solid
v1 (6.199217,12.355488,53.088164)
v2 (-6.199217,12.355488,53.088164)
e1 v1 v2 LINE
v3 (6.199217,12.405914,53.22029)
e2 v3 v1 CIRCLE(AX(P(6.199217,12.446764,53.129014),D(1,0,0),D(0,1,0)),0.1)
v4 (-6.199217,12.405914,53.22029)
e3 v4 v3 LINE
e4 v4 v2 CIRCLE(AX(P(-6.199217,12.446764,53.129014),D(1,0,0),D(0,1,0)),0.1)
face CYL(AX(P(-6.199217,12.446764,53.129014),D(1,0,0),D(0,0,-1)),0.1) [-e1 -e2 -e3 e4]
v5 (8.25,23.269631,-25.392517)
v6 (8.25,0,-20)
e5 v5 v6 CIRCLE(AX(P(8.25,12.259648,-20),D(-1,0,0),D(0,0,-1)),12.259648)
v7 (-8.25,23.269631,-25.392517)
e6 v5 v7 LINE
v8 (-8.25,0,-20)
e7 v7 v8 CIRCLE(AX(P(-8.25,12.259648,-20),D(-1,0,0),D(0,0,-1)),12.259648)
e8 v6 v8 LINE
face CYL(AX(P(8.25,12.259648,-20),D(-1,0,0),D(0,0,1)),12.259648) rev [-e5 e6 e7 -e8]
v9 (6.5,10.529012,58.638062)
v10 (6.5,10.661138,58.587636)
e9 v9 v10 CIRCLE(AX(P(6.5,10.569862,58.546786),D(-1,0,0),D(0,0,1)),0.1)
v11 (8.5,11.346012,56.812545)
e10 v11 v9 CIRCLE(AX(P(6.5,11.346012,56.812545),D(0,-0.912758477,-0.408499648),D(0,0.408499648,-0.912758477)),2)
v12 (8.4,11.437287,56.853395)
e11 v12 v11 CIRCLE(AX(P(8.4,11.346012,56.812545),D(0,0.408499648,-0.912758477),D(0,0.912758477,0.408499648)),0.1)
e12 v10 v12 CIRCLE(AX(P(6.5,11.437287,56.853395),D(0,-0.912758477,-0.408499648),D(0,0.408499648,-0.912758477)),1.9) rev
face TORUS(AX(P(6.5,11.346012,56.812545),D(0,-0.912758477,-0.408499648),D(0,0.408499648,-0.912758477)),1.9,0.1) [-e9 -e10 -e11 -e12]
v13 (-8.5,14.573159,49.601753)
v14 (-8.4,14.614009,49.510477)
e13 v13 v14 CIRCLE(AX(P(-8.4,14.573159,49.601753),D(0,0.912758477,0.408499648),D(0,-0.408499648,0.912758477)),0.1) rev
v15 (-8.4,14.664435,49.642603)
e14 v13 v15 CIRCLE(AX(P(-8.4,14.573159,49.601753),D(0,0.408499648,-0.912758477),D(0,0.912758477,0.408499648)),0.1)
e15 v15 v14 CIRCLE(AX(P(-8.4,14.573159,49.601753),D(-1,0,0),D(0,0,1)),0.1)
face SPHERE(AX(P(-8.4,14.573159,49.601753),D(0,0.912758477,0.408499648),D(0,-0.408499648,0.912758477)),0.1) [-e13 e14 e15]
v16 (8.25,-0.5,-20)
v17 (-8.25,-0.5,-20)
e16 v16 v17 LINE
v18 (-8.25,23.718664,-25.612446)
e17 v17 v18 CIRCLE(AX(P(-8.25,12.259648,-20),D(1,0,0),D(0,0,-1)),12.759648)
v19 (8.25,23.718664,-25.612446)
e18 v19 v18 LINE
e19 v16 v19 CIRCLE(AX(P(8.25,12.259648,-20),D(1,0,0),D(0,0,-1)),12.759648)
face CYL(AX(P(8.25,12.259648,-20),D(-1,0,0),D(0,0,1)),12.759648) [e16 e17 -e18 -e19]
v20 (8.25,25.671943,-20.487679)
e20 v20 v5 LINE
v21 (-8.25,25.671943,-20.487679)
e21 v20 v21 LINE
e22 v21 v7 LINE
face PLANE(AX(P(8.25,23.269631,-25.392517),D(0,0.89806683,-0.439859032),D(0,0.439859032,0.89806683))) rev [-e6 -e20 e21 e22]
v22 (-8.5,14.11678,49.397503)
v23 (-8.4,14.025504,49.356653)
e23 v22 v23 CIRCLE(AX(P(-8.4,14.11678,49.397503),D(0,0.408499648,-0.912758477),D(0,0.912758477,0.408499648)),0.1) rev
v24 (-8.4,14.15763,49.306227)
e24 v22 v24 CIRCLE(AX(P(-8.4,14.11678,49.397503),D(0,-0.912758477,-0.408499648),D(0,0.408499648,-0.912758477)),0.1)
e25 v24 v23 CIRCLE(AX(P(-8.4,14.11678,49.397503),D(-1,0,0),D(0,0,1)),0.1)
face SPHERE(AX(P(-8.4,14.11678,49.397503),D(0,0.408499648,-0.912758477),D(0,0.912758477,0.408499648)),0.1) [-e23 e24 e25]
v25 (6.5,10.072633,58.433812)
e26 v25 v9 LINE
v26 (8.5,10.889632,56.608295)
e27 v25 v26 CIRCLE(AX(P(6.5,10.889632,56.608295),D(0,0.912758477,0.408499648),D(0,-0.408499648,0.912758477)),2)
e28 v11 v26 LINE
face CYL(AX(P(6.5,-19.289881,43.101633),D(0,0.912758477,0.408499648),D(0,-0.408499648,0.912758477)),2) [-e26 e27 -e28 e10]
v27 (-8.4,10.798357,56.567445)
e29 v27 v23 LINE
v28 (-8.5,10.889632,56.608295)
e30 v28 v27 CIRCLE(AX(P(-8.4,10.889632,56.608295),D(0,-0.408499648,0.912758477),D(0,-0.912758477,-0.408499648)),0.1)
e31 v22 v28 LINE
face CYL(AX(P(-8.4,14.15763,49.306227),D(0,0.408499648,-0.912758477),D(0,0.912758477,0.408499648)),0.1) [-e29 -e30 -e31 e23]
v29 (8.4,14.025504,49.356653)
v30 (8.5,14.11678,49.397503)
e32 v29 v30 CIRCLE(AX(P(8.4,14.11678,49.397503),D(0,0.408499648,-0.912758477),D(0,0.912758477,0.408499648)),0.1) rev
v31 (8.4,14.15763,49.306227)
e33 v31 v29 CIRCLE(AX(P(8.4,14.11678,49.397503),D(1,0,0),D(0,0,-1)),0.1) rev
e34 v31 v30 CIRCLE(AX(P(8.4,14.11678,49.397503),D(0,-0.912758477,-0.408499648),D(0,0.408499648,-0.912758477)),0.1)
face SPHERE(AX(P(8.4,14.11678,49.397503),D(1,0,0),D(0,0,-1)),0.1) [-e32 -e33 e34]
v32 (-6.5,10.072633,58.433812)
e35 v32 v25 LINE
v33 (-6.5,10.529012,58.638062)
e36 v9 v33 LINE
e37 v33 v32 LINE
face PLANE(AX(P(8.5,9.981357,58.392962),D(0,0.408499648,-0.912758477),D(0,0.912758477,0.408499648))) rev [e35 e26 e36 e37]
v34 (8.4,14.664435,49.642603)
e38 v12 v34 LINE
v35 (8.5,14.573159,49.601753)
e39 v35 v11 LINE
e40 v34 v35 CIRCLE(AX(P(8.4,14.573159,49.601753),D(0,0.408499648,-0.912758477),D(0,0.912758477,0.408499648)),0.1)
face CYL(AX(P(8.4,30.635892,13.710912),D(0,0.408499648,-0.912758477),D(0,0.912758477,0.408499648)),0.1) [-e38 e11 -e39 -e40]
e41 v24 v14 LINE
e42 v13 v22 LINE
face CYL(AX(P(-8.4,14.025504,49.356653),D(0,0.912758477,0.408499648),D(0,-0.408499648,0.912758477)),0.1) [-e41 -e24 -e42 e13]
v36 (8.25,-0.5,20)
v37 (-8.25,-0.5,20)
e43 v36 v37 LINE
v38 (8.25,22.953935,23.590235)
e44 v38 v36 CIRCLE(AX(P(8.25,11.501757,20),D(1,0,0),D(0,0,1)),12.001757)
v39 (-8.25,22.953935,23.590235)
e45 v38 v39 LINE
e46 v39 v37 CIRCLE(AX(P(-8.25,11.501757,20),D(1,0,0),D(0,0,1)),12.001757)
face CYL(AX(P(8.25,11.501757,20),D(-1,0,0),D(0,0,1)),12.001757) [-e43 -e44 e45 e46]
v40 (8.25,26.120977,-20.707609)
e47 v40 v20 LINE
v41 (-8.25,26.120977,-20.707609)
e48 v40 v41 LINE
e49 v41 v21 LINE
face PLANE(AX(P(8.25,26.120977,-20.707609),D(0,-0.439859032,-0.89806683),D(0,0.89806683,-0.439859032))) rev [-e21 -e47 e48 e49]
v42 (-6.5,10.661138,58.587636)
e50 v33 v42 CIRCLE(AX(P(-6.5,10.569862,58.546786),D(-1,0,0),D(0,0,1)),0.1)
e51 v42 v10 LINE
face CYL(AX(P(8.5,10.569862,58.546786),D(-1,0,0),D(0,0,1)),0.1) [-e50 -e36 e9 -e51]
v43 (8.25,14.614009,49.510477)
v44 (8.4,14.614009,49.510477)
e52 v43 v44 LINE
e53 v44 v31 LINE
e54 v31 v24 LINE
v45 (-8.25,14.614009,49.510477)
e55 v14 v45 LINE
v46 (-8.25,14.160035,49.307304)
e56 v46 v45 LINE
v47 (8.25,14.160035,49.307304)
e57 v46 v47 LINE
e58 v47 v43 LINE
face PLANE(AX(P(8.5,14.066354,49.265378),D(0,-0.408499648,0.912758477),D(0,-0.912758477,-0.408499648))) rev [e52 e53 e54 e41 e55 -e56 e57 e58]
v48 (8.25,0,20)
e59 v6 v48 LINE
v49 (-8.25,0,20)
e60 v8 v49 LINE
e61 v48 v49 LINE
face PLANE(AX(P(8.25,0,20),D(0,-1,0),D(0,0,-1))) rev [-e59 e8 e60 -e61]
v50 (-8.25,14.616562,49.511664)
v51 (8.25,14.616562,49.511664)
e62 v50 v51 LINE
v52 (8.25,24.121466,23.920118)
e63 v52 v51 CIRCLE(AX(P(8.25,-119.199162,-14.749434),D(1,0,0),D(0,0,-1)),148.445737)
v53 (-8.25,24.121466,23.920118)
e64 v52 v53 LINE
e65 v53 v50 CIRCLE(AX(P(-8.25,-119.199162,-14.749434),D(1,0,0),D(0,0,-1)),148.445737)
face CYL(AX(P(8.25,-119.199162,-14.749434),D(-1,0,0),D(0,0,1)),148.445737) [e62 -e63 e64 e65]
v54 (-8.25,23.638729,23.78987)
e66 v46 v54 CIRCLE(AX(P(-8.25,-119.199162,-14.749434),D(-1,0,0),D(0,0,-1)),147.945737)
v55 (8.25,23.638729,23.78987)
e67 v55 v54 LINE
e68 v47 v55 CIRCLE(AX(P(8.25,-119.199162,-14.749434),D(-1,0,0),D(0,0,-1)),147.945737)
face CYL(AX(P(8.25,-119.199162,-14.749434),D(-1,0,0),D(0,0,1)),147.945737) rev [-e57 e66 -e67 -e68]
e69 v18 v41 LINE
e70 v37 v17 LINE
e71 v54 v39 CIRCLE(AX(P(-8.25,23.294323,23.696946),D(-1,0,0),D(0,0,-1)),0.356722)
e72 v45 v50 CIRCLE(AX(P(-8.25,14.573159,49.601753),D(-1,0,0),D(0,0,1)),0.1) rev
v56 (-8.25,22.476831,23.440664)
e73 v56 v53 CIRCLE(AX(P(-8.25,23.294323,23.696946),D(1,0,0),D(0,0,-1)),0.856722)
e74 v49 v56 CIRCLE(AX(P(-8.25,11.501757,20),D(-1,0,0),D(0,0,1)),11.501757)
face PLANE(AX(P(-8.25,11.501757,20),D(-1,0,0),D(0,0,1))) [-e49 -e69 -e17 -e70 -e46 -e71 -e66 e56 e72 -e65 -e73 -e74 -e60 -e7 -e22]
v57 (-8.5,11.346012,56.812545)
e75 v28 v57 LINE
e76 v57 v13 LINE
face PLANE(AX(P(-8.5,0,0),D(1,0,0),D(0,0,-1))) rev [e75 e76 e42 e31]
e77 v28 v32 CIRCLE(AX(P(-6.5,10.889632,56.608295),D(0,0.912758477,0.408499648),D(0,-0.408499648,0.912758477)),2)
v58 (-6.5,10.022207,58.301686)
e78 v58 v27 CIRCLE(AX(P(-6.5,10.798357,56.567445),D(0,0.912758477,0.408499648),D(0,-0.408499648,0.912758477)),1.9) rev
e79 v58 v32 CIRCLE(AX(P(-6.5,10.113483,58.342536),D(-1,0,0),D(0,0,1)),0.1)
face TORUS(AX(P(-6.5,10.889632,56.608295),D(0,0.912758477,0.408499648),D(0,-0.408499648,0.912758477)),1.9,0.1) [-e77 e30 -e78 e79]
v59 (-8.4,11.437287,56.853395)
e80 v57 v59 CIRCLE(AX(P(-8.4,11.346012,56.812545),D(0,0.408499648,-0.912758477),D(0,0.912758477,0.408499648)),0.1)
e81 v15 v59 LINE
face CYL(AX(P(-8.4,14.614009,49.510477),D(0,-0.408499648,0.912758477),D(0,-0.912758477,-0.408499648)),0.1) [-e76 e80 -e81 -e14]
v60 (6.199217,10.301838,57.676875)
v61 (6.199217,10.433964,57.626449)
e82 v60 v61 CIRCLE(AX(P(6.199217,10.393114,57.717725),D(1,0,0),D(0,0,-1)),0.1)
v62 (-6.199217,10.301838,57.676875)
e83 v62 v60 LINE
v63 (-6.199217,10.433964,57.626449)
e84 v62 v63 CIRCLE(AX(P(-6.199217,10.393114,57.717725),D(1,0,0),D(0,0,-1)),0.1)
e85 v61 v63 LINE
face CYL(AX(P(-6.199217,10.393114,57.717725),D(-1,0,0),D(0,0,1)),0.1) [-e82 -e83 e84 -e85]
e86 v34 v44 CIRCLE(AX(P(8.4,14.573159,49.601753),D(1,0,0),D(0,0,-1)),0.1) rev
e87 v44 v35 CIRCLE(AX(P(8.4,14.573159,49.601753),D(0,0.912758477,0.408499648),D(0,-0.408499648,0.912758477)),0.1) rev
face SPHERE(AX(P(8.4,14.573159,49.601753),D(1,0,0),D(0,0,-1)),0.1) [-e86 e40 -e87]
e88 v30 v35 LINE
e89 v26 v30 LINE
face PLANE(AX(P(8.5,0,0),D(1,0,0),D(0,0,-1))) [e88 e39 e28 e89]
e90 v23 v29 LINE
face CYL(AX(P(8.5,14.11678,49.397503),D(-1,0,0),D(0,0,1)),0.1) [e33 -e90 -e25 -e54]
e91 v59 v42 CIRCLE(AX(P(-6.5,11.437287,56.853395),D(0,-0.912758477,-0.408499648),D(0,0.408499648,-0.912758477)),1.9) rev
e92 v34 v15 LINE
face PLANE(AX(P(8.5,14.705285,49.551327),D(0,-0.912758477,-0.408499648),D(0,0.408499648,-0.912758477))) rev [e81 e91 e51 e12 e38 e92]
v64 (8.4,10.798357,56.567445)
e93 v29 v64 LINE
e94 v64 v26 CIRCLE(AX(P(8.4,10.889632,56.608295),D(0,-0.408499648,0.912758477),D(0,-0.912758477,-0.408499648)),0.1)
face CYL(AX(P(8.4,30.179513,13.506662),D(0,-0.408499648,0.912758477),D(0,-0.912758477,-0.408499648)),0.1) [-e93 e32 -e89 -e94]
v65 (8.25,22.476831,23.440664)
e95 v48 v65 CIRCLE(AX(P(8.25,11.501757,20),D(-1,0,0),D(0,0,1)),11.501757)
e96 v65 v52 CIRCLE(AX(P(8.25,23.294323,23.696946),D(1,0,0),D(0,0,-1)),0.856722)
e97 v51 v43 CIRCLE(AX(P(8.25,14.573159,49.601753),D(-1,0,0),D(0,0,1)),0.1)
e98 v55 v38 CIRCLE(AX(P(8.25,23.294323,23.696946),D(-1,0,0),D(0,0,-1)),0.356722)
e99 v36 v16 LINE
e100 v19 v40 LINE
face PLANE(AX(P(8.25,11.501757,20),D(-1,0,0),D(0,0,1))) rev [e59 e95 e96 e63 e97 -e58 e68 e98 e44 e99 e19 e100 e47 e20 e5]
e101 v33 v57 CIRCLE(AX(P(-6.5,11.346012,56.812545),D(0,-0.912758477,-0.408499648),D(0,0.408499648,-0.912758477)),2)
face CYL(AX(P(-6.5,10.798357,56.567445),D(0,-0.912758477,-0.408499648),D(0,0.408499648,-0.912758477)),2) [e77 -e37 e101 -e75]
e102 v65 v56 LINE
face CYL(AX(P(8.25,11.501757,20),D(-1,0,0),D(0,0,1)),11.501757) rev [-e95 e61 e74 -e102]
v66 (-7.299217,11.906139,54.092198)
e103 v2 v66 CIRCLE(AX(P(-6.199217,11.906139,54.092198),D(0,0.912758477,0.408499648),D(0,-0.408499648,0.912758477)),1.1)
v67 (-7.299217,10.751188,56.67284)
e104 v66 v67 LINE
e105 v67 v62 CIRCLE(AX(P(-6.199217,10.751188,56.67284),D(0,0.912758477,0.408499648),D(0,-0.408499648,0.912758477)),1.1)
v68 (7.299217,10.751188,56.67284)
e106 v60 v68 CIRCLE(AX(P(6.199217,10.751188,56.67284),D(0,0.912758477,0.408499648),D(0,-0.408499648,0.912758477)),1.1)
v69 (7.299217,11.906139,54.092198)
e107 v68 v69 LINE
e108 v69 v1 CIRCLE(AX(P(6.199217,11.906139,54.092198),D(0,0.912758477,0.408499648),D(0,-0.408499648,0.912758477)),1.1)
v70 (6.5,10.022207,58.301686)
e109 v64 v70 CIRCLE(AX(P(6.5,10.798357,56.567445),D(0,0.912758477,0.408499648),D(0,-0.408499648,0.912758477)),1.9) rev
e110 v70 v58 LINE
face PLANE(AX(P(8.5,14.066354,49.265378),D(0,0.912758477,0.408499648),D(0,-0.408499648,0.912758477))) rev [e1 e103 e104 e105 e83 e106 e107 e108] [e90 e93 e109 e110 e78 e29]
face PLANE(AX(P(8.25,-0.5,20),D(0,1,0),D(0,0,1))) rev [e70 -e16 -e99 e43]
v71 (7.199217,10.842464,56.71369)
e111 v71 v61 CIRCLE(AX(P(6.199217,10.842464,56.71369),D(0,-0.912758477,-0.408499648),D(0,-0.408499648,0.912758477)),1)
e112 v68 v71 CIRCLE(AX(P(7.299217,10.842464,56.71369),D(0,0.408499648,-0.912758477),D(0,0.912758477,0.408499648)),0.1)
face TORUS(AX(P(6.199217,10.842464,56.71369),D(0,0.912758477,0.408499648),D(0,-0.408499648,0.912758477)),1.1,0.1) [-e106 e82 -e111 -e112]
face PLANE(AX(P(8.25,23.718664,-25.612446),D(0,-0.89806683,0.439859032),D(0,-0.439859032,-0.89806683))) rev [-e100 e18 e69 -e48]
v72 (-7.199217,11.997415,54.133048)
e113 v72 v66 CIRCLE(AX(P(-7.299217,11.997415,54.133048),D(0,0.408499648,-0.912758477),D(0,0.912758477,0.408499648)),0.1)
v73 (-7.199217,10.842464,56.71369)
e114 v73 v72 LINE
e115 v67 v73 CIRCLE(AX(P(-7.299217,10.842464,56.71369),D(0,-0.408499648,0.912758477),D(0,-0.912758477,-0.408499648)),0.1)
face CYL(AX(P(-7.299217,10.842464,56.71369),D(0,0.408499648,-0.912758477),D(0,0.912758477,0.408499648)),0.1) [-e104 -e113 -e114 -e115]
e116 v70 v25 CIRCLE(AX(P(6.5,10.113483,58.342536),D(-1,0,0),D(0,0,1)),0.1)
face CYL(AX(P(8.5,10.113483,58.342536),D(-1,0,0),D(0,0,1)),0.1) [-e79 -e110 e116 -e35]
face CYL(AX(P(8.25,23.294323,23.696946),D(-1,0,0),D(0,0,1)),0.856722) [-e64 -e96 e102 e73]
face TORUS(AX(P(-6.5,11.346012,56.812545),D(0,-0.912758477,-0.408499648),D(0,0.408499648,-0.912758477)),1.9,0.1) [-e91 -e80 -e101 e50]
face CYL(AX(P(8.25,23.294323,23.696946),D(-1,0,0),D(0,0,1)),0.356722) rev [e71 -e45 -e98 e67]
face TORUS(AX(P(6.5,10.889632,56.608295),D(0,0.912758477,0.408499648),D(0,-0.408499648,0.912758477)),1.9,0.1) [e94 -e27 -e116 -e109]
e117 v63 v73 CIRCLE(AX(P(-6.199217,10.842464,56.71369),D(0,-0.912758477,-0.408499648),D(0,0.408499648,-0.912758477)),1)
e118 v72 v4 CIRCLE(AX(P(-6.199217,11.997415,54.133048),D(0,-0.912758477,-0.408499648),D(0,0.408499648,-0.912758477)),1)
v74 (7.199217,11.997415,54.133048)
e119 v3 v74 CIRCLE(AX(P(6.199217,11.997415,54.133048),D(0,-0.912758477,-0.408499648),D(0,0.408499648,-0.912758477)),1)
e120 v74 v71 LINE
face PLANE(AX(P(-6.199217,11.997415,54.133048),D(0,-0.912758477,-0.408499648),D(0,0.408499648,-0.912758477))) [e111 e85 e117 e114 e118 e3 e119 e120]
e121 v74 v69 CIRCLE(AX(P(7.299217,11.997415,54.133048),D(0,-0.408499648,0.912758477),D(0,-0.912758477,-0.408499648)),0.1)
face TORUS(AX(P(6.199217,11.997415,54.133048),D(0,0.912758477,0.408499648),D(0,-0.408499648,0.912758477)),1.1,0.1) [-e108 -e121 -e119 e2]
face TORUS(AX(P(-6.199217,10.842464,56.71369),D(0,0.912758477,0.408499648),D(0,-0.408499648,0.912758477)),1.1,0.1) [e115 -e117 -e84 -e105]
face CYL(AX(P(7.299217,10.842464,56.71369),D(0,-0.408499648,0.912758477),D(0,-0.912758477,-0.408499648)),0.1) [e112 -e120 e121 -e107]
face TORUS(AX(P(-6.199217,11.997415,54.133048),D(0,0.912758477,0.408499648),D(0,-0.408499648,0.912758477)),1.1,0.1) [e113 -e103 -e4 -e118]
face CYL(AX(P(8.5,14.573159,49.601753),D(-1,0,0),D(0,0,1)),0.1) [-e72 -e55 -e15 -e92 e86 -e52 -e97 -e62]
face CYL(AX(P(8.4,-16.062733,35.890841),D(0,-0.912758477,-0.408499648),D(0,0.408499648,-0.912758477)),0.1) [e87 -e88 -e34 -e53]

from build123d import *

# Parameters (mm, degrees)
BOSS_EXTRUDE1_DEPTH = 8.25
BOSS_EXTRUDE2_DEPTH = 8.5
FILLET2_R           = 2
CUT_EXTRUDE1_DEPTH  = 0.1
FILLET1_R           = 0.1


with BuildPart() as part:
    # Sketch1 → Boss-Extrude1 (new, symmetric)
    with BuildSketch(Plane(origin=(0, 0, 0), x_dir=(0, 0, -1), z_dir=(1, 0, 0))):
        with BuildLine():
            Line((-20, 0), (20, 0))
            ThreePointArc((20, 0), (31.94314613143427, 9.491936676512388), (25.392516821689124, 23.269630860737195))
            Line((25.392516821689124, 23.269630860737195), (20.48767915496346, 25.67194333522964))
            Line((20.48767915496346, 25.67194333522964), (20.707608671089492, 26.12097675039667))
            Line((20.707608671089492, 26.12097675039667), (25.612446337815154, 23.71866427590423))
            ThreePointArc((25.612446337815154, 23.71866427590423), (32.4302378618011, 9.379057775878826), (20, -0.5))
            Line((20, -0.5), (-20, -0.4999999999999987))
            ThreePointArc((-20, -0.4999999999999987), (-31.863566841643475, 9.685729623859952), (-23.590234900340555, 22.953935409328388))
            ThreePointArc((-23.590234900340555, 22.953935409328388), (-23.354479596787012, 23.394160454012642), (-23.789870300203464, 23.638728621400347))
            ThreePointArc((-23.789870300203464, 23.638728621400347), (-36.8961810366091, 19.4394741124151), (-49.55557214404263, 14.040498622612501))
            Line((-49.55557214404263, 14.040498622612501), (-49.77289846768594, 14.4907977110545))
            ThreePointArc((-49.77289846768594, 14.4907977110545), (-37.070723460551015, 19.908019672894), (-23.920118407045663, 24.1214660558966))
            ThreePointArc((-23.920118407045663, 24.1214660558966), (-22.874461521184195, 23.534098465627046), (-23.440663680772627, 22.47683117514367))
            ThreePointArc((-23.440663680772627, 22.47683117514367), (-31.36932392713061, 9.761386358218672), (-20, 0))
        make_face()
    extrude(amount=BOSS_EXTRUDE1_DEPTH, both=True)

    # Sketch2 → Boss-Extrude2 (add, symmetric)
    with BuildSketch(Plane(origin=(0, 0, 0), x_dir=(0, 0, -1), z_dir=(1, 0, 0))):
        Polygon((-49.26537752455312, 14.066353693944993), (-58.392962295280306, 9.981357212528026), (-58.67891204897949, 10.620288146478929), (-49.5513272782523, 14.705284627895898), align=None)
    extrude(amount=BOSS_EXTRUDE2_DEPTH, both=True)

    # Fillet2
    fillet2_edges = [part.edges().sort_by_distance(p)[0] for p in [
        (-8.5, 10.300822679503478, 58.5359371721299),
        (8.5, 10.300822679503478, 58.5359371721299),
    ]]
    fillet(fillet2_edges, radius=FILLET2_R)

    # Sketch3 → Cut-Extrude1 (cut)
    with BuildSketch(Plane(origin=(0, 30.088237033082944, 13.465812205476922), x_dir=(1, 0, 0), z_dir=(0, -0.9127584770727193, -0.40849964814169676))):
        with BuildLine():
            Line((-6.1992171672518035, 48.336758954326044), (6.1992171672518035, 48.336758954326044))
            ThreePointArc((6.1992171672518035, 48.336758954326044), (6.9063239484383585, 48.04386573551259), (7.199217167251811, 47.33675895432604))
            Line((7.199217167251811, 47.33675895432604), (7.199217167251811, 44.50945894575458))
            ThreePointArc((7.199217167251811, 44.50945894575458), (6.9063239484383585, 43.80235216456803), (6.1992171672518035, 43.509458945754574))
            Line((6.1992171672518035, 43.509458945754574), (-6.1992171672518035, 43.509458945754574))
            ThreePointArc((-6.1992171672518035, 43.509458945754574), (-6.9063239484383585, 43.80235216456803), (-7.199217167251811, 44.50945894575458))
            Line((-7.199217167251811, 44.50945894575458), (-7.199217167251811, 47.33675895432604))
            ThreePointArc((-7.199217167251811, 47.33675895432604), (-6.906323948438358, 48.04386573551259), (-6.1992171672518035, 48.336758954326044))
        make_face()
    extrude(amount=-CUT_EXTRUDE1_DEPTH, mode=Mode.SUBTRACT)

    # Fillet1
    # the kernel refuses this fillet: 0.1 mm, written as the material it takes off along each edge
    with BuildSketch(Plane(origin=(-8.4, 14.573158815374455, 49.601753161145396), x_dir=(-1, 0, 0), z_dir=(0, 0.9127584770727193, 0.40849964814169704))) as fillet1_piece_1_section:
        Polygon((0, 0), (FILLET1_R * 1.02, 0), (FILLET1_R * 1.02, -FILLET1_R * 1.02), (0, -FILLET1_R * 1.02), align=None)
    fillet1_piece_1 = extrude(amount=FILLET1_R * 1.02, mode=Mode.PRIVATE)
    fillet1_piece_1 = fillet1_piece_1 - Plane(origin=(-8.4, 14.573158815374455, 49.601753161145396), x_dir=(0.7071067811865475, -0.28885287131331006, 0.6454177087236268), z_dir=(0, 0.9127584770727193, 0.40849964814169704)) * Sphere(FILLET1_R, mode=Mode.PRIVATE)
    add(fillet1_piece_1, mode=Mode.SUBTRACT)
    with BuildSketch(Plane(origin=(-8.4, 14.116779576838097, 49.39750333707456), x_dir=(0, 0.4084996481416934, -0.912758477072721), z_dir=(-1, 0, 0))) as fillet1_piece_2_section:
        Polygon((0, 0), (FILLET1_R * 1.02, 0), (FILLET1_R * 1.02, FILLET1_R * 1.02), (3.9e-16, FILLET1_R * 1.02), align=None)
    fillet1_piece_2 = extrude(amount=FILLET1_R * 1.02, mode=Mode.PRIVATE)
    fillet1_piece_2 = fillet1_piece_2 - Plane(origin=(-8.4, 14.116779576838097, 49.39750333707456), x_dir=(0, 0.35656483741031497, 0.9342705800369375), z_dir=(-1, 0, 0)) * Sphere(FILLET1_R, mode=Mode.PRIVATE)
    add(fillet1_piece_2, mode=Mode.SUBTRACT)
    with BuildSketch(Plane(origin=(8.4, 14.116779576838095, 49.39750333707456), x_dir=(1, 0, 0), z_dir=(0, 0.4084996481416934, -0.912758477072721))) as fillet1_piece_3_section:
        Polygon((0, 0), (FILLET1_R * 1.02, 0), (FILLET1_R * 1.02, FILLET1_R * 1.02), (0, FILLET1_R * 1.02), align=None)
    fillet1_piece_3 = extrude(amount=FILLET1_R * 1.02, mode=Mode.PRIVATE)
    fillet1_piece_3 = fillet1_piece_3 - Plane(origin=(8.4, 14.116779576838095, 49.39750333707456), x_dir=(-0.7071067811865475, 0.6454177087236256, 0.2888528713133125), z_dir=(0, 0.4084996481416934, -0.912758477072721)) * Sphere(FILLET1_R, mode=Mode.PRIVATE)
    add(fillet1_piece_3, mode=Mode.SUBTRACT)
    with BuildSketch(Plane(origin=(8.4, 14.573158815374455, 49.601753161145396), x_dir=(0, 0.4084996481416934, -0.912758477072721), z_dir=(0, 0.9127584770727193, 0.40849964814169704))) as fillet1_piece_4_section:
        Polygon((0, 0), (FILLET1_R * 1.02, 0), (FILLET1_R * 1.02, -FILLET1_R * 1.02), (0, -FILLET1_R * 1.02), align=None)
    fillet1_piece_4 = extrude(amount=FILLET1_R * 1.02, mode=Mode.PRIVATE)
    fillet1_piece_4 = fillet1_piece_4 - Plane(origin=(8.4, 14.573158815374455, 49.601753161145396), x_dir=(-0.7071067811865475, -0.28885287131331006, 0.6454177087236268), z_dir=(0, 0.9127584770727193, 0.40849964814169704)) * Sphere(FILLET1_R, mode=Mode.PRIVATE)
    add(fillet1_piece_4, mode=Mode.SUBTRACT)
    with BuildSketch(Plane(origin=(-8.5, 11.43728744276232, 56.853395094834056), x_dir=(1, 0, 0), z_dir=(0, 0.40849964814169704, -0.9127584770727193))) as fillet1_piece_5:
        with BuildLine():
            CenterArc((FILLET1_R, FILLET1_R), FILLET1_R, 180, 90)
            Line((0, FILLET1_R), (0, 0))
            Line((0, 0), (FILLET1_R, 0))
        make_face()
    extrude(amount=7.900000000000008, mode=Mode.SUBTRACT)
    with BuildSketch(Plane(origin=(-8.5, 14.025503729130824, 49.35665337226039), x_dir=(0, 0.9127584770727193, 0.40849964814169687), z_dir=(0, -0.40849964814169687, 0.9127584770727193))) as fillet1_piece_6:
        with BuildLine():
            CenterArc((FILLET1_R, -FILLET1_R), FILLET1_R, 90, 90)
            Line((0, -FILLET1_R), (0, 0))
            Line((0, 0), (FILLET1_R, 0))
        make_face()
    extrude(amount=7.9, mode=Mode.SUBTRACT)
    with BuildSketch(Plane(origin=(-8.5, 14.614008780188621, 49.51047731343813), x_dir=(0, -0.40849964814169337, 0.9127584770727208), z_dir=(0, -0.912758477072721, -0.4084996481416934))) as fillet1_piece_7:
        with BuildLine():
            CenterArc((FILLET1_R, -FILLET1_R), FILLET1_R, 90, 90)
            Line((1.45e-15, -FILLET1_R), (0, 0))
            Line((0, 0), (FILLET1_R, 0))
        make_face()
    extrude(amount=0.4999999999999936, mode=Mode.SUBTRACT)
    with BuildSketch(Plane(origin=(6.5, 10.620288146478929, 58.67891204897949), x_dir=(0, 0.4084996481416779, -0.9127584770727277), z_dir=(-1, 0, 0))) as fillet1_piece_8:
        with BuildLine():
            CenterArc((FILLET1_R, FILLET1_R), FILLET1_R, 179.99999999999815, 89.99999999999955)
            Line((2.51e-15, FILLET1_R), (0, 0))
            Line((0, 0), (FILLET1_R, 0))
        make_face()
    extrude(amount=13, mode=Mode.SUBTRACT)
    with BuildSketch(Plane(origin=(6.5, 9.981357212528026, 58.392962295280306), x_dir=(0, 0.9127584770727145, 0.40849964814170747), z_dir=(-1, 0, 0))) as fillet1_piece_9:
        with BuildLine():
            CenterArc((FILLET1_R, FILLET1_R), FILLET1_R, 179.9999999999996, 90.00000000000131)
            Line((0, FILLET1_R), (0, 0))
            Line((0, 0), (FILLET1_R, 0))
        make_face()
    extrude(amount=13, mode=Mode.SUBTRACT)
    with BuildSketch(Plane(origin=(8.5, 14.025503729130824, 49.35665337226039), x_dir=(0, 0.9127584770727193, 0.40849964814169687), z_dir=(0, -0.40849964814169687, 0.9127584770727193))) as fillet1_piece_10:
        with BuildLine():
            CenterArc((FILLET1_R, FILLET1_R), FILLET1_R, 180, 90)
            Line((0, FILLET1_R), (0, 0))
            Line((0, 0), (FILLET1_R, 0))
        make_face()
    extrude(amount=7.9, mode=Mode.SUBTRACT)
    with BuildSketch(Plane(origin=(8.5, 11.43728744276232, 56.853395094834056), x_dir=(-1, 0, 0), z_dir=(0, 0.40849964814169704, -0.9127584770727193))) as fillet1_piece_11:
        with BuildLine():
            CenterArc((FILLET1_R, -FILLET1_R), FILLET1_R, 90, 90)
            Line((0, -FILLET1_R), (0, 0))
            Line((0, 0), (FILLET1_R, 0))
        make_face()
    extrude(amount=7.900000000000008, mode=Mode.SUBTRACT)
    with BuildSketch(Plane(origin=(8.5, 14.614008780188621, 49.51047731343813), x_dir=(-1, -5.93e-15, 1.325e-14), z_dir=(0, -0.912758477072721, -0.4084996481416934))) as fillet1_piece_12:
        with BuildLine():
            CenterArc((FILLET1_R, -FILLET1_R), FILLET1_R, 90.00000000000082, 89.99999999999918)
            Line((1.45e-15, -FILLET1_R), (0, 0))
            Line((0, 0), (FILLET1_R, 0))
        make_face()
    extrude(amount=0.499999999999992, mode=Mode.SUBTRACT)
    with BuildSketch(Plane(origin=(-8.4, 14.066353693944993, 49.26537752455312), x_dir=(0, 0.9127584770727116, 0.40849964814171413), z_dir=(1, 0, 0))) as fillet1_piece_13:
        with BuildLine():
            CenterArc((FILLET1_R, FILLET1_R), FILLET1_R, 180, 89.99999999999864)
            Line((2.35e-15, FILLET1_R), (0, 0))
            Line((0, 0), (FILLET1_R, 0))
        make_face()
    extrude(amount=16.799999999999997, mode=Mode.SUBTRACT)
    with BuildSketch(Plane(origin=(-8.4, 14.705284627895898, 49.5513272782523), x_dir=(0, -0.40849964814173395, 0.9127584770727026), z_dir=(1, 0, 0))) as fillet1_piece_14_section:
        with BuildLine():
            CenterArc((FILLET1_R, FILLET1_R), FILLET1_R, 179.99999999999554, 90.00000000000318)
            Line((-2.13e-15, FILLET1_R), (0, 0))
            Line((0, 0), (FILLET1_R, 0))
        make_face()
    fillet1_piece_14 = extrude(amount=16.799999999999997, mode=Mode.PRIVATE)
    fillet1_piece_14 = fillet1_piece_14 - Plane(origin=(-8.325000000000001, -119.19916199032235, -14.749433901316772), x_dir=(0, 0.9005981768840285, 0.4346526472865017), z_dir=(1, 0, 0)) * Cylinder(148.4457365480458, 35, mode=Mode.PRIVATE)
    add(fillet1_piece_14, mode=Mode.SUBTRACT)
    with BuildSketch(Plane(origin=(-8.4, 14.705284627895898, 49.5513272782523), x_dir=(0, -0.40849964814173395, 0.9127584770727026), z_dir=(1, 0, 0))) as fillet1_piece_15_section:
        with BuildLine():
            CenterArc((FILLET1_R, FILLET1_R), FILLET1_R, 179.99999999999554, 90.00000000000318)
            Line((-2.13e-15, FILLET1_R), (0, 0))
            Line((0, 0), (FILLET1_R, 0))
        make_face()
    fillet1_piece_15 = extrude(amount=16.799999999999997, mode=Mode.PRIVATE)
    fillet1_piece_15 = split(fillet1_piece_15, bisect_by=Plane(origin=(-8.25, 14.615931564484248, 49.51135087212141), z_dir=(-1, 0, 0)), keep=Keep.TOP, mode=Mode.PRIVATE)
    add(fillet1_piece_15, mode=Mode.SUBTRACT)
    with BuildSketch(Plane(origin=(-8.4, 14.705284627895898, 49.5513272782523), x_dir=(0, -0.40849964814173395, 0.9127584770727026), z_dir=(1, 0, 0))) as fillet1_piece_16_section:
        with BuildLine():
            CenterArc((FILLET1_R, FILLET1_R), FILLET1_R, 179.99999999999554, 90.00000000000318)
            Line((-2.13e-15, FILLET1_R), (0, 0))
            Line((0, 0), (FILLET1_R, 0))
        make_face()
    fillet1_piece_16 = extrude(amount=16.799999999999997, mode=Mode.PRIVATE)
    fillet1_piece_16 = split(fillet1_piece_16, bisect_by=Plane(origin=(8.25, 14.615931564484251, 49.51135087212142), z_dir=(1, 0, 0)), keep=Keep.TOP, mode=Mode.PRIVATE)
    add(fillet1_piece_16, mode=Mode.SUBTRACT)
    with BuildSketch(Plane(origin=(-6.5, 10.79835650881142, 56.56744534113487), x_dir=(-1, 0, 0), z_dir=(0, 0.40849964814169437, -0.9127584770727205))) as fillet1_piece_17:
        with BuildLine():
            CenterArc((2 - FILLET1_R, FILLET1_R), FILLET1_R, 270, 90)
            Line((2 - FILLET1_R, -4.52e-15), (2, 0))
            Line((2, 0), (2, FILLET1_R))
        make_face()
    revolve(axis=Axis((-6.5, 10.79835650881142, 56.56744534113487), (0, 0.9127584770727205, 0.40849964814169437)), revolution_arc=89.99999999999994, mode=Mode.SUBTRACT)
    with BuildSketch(Plane(origin=(6.5, 10.79835650881142, 56.56744534113487), x_dir=(1, 0, 0), z_dir=(0, 0.40849964814169437, -0.9127584770727205))) as fillet1_piece_18:
        with BuildLine():
            CenterArc((2 - FILLET1_R, -FILLET1_R), FILLET1_R, 0, 90)
            Line((2 - FILLET1_R, 4.52e-15), (2, 0))
            Line((2, 0), (2, -FILLET1_R))
        make_face()
    revolve(axis=Axis((6.5, 10.79835650881142, 56.56744534113487), (0, -0.9127584770727205, -0.40849964814169437)), revolution_arc=89.99999999999994, mode=Mode.SUBTRACT)
    with BuildSketch(Plane(origin=(-6.5, 11.437287442762319, 56.853395094834056), x_dir=(-1, 0, 0), z_dir=(0, 0.40849964814169437, -0.9127584770727205))) as fillet1_piece_19:
        with BuildLine():
            CenterArc((2 - FILLET1_R, -FILLET1_R), FILLET1_R, 359.99999999999835, 90.00000000000165)
            Line((2, -FILLET1_R), (2, 0))
            Line((2, 0), (2 - FILLET1_R, 1.62e-15))
        make_face()
    revolve(axis=Axis((-6.5, 11.437287442762319, 56.853395094834056), (0, 0.9127584770727205, 0.40849964814169437)), revolution_arc=90, mode=Mode.SUBTRACT)
    with BuildSketch(Plane(origin=(6.5, 11.437287442762319, 56.853395094834056), x_dir=(1, 0, 0), z_dir=(0, 0.40849964814169437, -0.9127584770727205))) as fillet1_piece_20:
        with BuildLine():
            CenterArc((2 - FILLET1_R, FILLET1_R), FILLET1_R, 270, 90.00000000000166)
            Line((2, FILLET1_R), (2, 0))
            Line((2, 0), (2 - FILLET1_R, -1.62e-15))
        make_face()
    revolve(axis=Axis((6.5, 11.437287442762319, 56.853395094834056), (0, -0.9127584770727205, -0.40849964814169437)), revolution_arc=90, mode=Mode.SUBTRACT)
    with BuildSketch(Plane(origin=(7.199217167251811, 10.751187656072442, 56.67284021818597), x_dir=(1, -1.3009e-13, -5.822e-14), z_dir=(0, 0.4084996481416968, -0.9127584770727194))) as fillet1_piece_21:
        with BuildLine():
            CenterArc((FILLET1_R, -FILLET1_R), FILLET1_R, 89.99999999999183, 90.00000000000465)
            Line((-1.425e-14, -FILLET1_R), (0, 0))
            Line((0, 0), (FILLET1_R, 0))
        make_face()
    extrude(amount=2.827300008571454, mode=Mode.SUBTRACT)
    with BuildSketch(Plane(origin=(6.199217167251807, 11.9061387147649, 54.092198168134594), x_dir=(1, -3.55e-15, 7.11e-15), z_dir=(-7.936821341612911e-15, -0.4084996481416968, 0.9127584770727194))) as fillet1_piece_22:
        with BuildLine():
            CenterArc((1.0000000000000018 + FILLET1_R, FILLET1_R), FILLET1_R, 179.99999999999, 90.00000000001)
            Line((1.0000000000000018, FILLET1_R), (1.0000000000000018, 0))
            Line((1.0000000000000018, 0), (1.0000000000000018 + FILLET1_R, -1.422e-14))
        make_face()
    revolve(axis=Axis((6.199217167251807, 11.9061387147649, 54.092198168134594), (0, 0.9127584770727194, 0.4084996481416968)), revolution_arc=90.00000000000061, mode=Mode.SUBTRACT)
    with BuildSketch(Plane(origin=(6.1992171672518035, 12.3146383629066, 53.17943969106187), x_dir=(0, 0.4084996481415774, -0.9127584770727728), z_dir=(-1, 0, 0))) as fillet1_piece_23:
        with BuildLine():
            CenterArc((FILLET1_R, -FILLET1_R), FILLET1_R, 89.99999999999143, 90.00000000001319)
            Line((-1.135e-14, -FILLET1_R), (0, 0))
            Line((0, 0), (FILLET1_R, 0))
        make_face()
    extrude(amount=12.398434334503607, mode=Mode.SUBTRACT)
    with BuildSketch(Plane(origin=(-6.199217167251807, 11.9061387147649, 54.092198168134594), x_dir=(3.5527136788004915e-15, 0.40849964814169826, -0.9127584770727186), z_dir=(1, -1.45e-15, 3.24e-15))) as fillet1_piece_24:
        with BuildLine():
            CenterArc((1.0000000000000027 + FILLET1_R, FILLET1_R), FILLET1_R, 179.9999999999887, 90.00000000001234)
            Line((1.0000000000000038, FILLET1_R), (1.0000000000000027, 0))
            Line((1.0000000000000027, 0), (1.0000000000000027 + FILLET1_R, -1.323e-14))
        make_face()
    revolve(axis=Axis((-6.199217167251807, 11.9061387147649, 54.092198168134594), (0, 0.9127584770727194, 0.4084996481416968)), revolution_arc=90.00000000000061, mode=Mode.SUBTRACT)
    with BuildSketch(Plane(origin=(-7.199217167251811, 11.906138714764896, 54.0921981681346), x_dir=(-1, -1.3009e-13, -5.822e-14), z_dir=(0, -0.4084996481416968, 0.9127584770727194))) as fillet1_piece_25:
        with BuildLine():
            CenterArc((FILLET1_R, -FILLET1_R), FILLET1_R, 89.99999999999183, 90.0000000000091)
            Line((-1.425e-14, -FILLET1_R), (0, 0))
            Line((0, 0), (FILLET1_R, 0))
        make_face()
    extrude(amount=2.827300008571454, mode=Mode.SUBTRACT)
    with BuildSketch(Plane(origin=(-6.199217167251806, 10.751187656072442, 56.67284021818597), x_dir=(-1, 0, 0), z_dir=(0, 0.4084996481416968, -0.9127584770727194))) as fillet1_piece_26:
        with BuildLine():
            CenterArc((1.0000000000000062 + FILLET1_R, FILLET1_R), FILLET1_R, 179.99999999999537, 90.00000000000466)
            Line((1.0000000000000062, FILLET1_R), (1.0000000000000062, 0))
            Line((1.0000000000000062, 0), (1.0000000000000062 + FILLET1_R, -1.425e-14))
        make_face()
    revolve(axis=Axis((-6.199217167251806, 10.751187656072442, 56.67284021818597), (0, 0.9127584770727194, 0.4084996481416968)), revolution_arc=90.00000000000016, mode=Mode.SUBTRACT)
    with BuildSketch(Plane(origin=(-6.1992171672518035, 10.342688007930743, 57.585598695258696), x_dir=(0, -0.40849964814183753, 0.9127584770726563), z_dir=(1, 0, 0))) as fillet1_piece_27:
        with BuildLine():
            CenterArc((FILLET1_R, -FILLET1_R), FILLET1_R, 89.99999999999226, 90.00000000001148)
            Line((-1.642e-14, -FILLET1_R), (0, 0))
            Line((0, 0), (FILLET1_R, 0))
        make_face()
    extrude(amount=12.398434334503607, mode=Mode.SUBTRACT)
    with BuildSketch(Plane(origin=(6.199217167251807, 10.751187656072439, 56.672840218185975), x_dir=(-3.552713678800497e-15, -0.40849964814169537, 0.9127584770727201), z_dir=(-1, 1.45e-15, -3.24e-15))) as fillet1_piece_28:
        with BuildLine():
            CenterArc((1.0000000000000013 + FILLET1_R, FILLET1_R), FILLET1_R, 179.99999999998826, 90.00000000001057)
            Line((1.000000000000001, FILLET1_R), (1.0000000000000013, -2e-17))
            Line((1.0000000000000013, -2e-17), (1.0000000000000013 + FILLET1_R, -1.557e-14))
        make_face()
    revolve(axis=Axis((6.199217167251807, 10.751187656072439, 56.672840218185975), (0, 0.9127584770727194, 0.4084996481416968)), revolution_arc=90.00000000000061, mode=Mode.SUBTRACT)


solid = part.part
